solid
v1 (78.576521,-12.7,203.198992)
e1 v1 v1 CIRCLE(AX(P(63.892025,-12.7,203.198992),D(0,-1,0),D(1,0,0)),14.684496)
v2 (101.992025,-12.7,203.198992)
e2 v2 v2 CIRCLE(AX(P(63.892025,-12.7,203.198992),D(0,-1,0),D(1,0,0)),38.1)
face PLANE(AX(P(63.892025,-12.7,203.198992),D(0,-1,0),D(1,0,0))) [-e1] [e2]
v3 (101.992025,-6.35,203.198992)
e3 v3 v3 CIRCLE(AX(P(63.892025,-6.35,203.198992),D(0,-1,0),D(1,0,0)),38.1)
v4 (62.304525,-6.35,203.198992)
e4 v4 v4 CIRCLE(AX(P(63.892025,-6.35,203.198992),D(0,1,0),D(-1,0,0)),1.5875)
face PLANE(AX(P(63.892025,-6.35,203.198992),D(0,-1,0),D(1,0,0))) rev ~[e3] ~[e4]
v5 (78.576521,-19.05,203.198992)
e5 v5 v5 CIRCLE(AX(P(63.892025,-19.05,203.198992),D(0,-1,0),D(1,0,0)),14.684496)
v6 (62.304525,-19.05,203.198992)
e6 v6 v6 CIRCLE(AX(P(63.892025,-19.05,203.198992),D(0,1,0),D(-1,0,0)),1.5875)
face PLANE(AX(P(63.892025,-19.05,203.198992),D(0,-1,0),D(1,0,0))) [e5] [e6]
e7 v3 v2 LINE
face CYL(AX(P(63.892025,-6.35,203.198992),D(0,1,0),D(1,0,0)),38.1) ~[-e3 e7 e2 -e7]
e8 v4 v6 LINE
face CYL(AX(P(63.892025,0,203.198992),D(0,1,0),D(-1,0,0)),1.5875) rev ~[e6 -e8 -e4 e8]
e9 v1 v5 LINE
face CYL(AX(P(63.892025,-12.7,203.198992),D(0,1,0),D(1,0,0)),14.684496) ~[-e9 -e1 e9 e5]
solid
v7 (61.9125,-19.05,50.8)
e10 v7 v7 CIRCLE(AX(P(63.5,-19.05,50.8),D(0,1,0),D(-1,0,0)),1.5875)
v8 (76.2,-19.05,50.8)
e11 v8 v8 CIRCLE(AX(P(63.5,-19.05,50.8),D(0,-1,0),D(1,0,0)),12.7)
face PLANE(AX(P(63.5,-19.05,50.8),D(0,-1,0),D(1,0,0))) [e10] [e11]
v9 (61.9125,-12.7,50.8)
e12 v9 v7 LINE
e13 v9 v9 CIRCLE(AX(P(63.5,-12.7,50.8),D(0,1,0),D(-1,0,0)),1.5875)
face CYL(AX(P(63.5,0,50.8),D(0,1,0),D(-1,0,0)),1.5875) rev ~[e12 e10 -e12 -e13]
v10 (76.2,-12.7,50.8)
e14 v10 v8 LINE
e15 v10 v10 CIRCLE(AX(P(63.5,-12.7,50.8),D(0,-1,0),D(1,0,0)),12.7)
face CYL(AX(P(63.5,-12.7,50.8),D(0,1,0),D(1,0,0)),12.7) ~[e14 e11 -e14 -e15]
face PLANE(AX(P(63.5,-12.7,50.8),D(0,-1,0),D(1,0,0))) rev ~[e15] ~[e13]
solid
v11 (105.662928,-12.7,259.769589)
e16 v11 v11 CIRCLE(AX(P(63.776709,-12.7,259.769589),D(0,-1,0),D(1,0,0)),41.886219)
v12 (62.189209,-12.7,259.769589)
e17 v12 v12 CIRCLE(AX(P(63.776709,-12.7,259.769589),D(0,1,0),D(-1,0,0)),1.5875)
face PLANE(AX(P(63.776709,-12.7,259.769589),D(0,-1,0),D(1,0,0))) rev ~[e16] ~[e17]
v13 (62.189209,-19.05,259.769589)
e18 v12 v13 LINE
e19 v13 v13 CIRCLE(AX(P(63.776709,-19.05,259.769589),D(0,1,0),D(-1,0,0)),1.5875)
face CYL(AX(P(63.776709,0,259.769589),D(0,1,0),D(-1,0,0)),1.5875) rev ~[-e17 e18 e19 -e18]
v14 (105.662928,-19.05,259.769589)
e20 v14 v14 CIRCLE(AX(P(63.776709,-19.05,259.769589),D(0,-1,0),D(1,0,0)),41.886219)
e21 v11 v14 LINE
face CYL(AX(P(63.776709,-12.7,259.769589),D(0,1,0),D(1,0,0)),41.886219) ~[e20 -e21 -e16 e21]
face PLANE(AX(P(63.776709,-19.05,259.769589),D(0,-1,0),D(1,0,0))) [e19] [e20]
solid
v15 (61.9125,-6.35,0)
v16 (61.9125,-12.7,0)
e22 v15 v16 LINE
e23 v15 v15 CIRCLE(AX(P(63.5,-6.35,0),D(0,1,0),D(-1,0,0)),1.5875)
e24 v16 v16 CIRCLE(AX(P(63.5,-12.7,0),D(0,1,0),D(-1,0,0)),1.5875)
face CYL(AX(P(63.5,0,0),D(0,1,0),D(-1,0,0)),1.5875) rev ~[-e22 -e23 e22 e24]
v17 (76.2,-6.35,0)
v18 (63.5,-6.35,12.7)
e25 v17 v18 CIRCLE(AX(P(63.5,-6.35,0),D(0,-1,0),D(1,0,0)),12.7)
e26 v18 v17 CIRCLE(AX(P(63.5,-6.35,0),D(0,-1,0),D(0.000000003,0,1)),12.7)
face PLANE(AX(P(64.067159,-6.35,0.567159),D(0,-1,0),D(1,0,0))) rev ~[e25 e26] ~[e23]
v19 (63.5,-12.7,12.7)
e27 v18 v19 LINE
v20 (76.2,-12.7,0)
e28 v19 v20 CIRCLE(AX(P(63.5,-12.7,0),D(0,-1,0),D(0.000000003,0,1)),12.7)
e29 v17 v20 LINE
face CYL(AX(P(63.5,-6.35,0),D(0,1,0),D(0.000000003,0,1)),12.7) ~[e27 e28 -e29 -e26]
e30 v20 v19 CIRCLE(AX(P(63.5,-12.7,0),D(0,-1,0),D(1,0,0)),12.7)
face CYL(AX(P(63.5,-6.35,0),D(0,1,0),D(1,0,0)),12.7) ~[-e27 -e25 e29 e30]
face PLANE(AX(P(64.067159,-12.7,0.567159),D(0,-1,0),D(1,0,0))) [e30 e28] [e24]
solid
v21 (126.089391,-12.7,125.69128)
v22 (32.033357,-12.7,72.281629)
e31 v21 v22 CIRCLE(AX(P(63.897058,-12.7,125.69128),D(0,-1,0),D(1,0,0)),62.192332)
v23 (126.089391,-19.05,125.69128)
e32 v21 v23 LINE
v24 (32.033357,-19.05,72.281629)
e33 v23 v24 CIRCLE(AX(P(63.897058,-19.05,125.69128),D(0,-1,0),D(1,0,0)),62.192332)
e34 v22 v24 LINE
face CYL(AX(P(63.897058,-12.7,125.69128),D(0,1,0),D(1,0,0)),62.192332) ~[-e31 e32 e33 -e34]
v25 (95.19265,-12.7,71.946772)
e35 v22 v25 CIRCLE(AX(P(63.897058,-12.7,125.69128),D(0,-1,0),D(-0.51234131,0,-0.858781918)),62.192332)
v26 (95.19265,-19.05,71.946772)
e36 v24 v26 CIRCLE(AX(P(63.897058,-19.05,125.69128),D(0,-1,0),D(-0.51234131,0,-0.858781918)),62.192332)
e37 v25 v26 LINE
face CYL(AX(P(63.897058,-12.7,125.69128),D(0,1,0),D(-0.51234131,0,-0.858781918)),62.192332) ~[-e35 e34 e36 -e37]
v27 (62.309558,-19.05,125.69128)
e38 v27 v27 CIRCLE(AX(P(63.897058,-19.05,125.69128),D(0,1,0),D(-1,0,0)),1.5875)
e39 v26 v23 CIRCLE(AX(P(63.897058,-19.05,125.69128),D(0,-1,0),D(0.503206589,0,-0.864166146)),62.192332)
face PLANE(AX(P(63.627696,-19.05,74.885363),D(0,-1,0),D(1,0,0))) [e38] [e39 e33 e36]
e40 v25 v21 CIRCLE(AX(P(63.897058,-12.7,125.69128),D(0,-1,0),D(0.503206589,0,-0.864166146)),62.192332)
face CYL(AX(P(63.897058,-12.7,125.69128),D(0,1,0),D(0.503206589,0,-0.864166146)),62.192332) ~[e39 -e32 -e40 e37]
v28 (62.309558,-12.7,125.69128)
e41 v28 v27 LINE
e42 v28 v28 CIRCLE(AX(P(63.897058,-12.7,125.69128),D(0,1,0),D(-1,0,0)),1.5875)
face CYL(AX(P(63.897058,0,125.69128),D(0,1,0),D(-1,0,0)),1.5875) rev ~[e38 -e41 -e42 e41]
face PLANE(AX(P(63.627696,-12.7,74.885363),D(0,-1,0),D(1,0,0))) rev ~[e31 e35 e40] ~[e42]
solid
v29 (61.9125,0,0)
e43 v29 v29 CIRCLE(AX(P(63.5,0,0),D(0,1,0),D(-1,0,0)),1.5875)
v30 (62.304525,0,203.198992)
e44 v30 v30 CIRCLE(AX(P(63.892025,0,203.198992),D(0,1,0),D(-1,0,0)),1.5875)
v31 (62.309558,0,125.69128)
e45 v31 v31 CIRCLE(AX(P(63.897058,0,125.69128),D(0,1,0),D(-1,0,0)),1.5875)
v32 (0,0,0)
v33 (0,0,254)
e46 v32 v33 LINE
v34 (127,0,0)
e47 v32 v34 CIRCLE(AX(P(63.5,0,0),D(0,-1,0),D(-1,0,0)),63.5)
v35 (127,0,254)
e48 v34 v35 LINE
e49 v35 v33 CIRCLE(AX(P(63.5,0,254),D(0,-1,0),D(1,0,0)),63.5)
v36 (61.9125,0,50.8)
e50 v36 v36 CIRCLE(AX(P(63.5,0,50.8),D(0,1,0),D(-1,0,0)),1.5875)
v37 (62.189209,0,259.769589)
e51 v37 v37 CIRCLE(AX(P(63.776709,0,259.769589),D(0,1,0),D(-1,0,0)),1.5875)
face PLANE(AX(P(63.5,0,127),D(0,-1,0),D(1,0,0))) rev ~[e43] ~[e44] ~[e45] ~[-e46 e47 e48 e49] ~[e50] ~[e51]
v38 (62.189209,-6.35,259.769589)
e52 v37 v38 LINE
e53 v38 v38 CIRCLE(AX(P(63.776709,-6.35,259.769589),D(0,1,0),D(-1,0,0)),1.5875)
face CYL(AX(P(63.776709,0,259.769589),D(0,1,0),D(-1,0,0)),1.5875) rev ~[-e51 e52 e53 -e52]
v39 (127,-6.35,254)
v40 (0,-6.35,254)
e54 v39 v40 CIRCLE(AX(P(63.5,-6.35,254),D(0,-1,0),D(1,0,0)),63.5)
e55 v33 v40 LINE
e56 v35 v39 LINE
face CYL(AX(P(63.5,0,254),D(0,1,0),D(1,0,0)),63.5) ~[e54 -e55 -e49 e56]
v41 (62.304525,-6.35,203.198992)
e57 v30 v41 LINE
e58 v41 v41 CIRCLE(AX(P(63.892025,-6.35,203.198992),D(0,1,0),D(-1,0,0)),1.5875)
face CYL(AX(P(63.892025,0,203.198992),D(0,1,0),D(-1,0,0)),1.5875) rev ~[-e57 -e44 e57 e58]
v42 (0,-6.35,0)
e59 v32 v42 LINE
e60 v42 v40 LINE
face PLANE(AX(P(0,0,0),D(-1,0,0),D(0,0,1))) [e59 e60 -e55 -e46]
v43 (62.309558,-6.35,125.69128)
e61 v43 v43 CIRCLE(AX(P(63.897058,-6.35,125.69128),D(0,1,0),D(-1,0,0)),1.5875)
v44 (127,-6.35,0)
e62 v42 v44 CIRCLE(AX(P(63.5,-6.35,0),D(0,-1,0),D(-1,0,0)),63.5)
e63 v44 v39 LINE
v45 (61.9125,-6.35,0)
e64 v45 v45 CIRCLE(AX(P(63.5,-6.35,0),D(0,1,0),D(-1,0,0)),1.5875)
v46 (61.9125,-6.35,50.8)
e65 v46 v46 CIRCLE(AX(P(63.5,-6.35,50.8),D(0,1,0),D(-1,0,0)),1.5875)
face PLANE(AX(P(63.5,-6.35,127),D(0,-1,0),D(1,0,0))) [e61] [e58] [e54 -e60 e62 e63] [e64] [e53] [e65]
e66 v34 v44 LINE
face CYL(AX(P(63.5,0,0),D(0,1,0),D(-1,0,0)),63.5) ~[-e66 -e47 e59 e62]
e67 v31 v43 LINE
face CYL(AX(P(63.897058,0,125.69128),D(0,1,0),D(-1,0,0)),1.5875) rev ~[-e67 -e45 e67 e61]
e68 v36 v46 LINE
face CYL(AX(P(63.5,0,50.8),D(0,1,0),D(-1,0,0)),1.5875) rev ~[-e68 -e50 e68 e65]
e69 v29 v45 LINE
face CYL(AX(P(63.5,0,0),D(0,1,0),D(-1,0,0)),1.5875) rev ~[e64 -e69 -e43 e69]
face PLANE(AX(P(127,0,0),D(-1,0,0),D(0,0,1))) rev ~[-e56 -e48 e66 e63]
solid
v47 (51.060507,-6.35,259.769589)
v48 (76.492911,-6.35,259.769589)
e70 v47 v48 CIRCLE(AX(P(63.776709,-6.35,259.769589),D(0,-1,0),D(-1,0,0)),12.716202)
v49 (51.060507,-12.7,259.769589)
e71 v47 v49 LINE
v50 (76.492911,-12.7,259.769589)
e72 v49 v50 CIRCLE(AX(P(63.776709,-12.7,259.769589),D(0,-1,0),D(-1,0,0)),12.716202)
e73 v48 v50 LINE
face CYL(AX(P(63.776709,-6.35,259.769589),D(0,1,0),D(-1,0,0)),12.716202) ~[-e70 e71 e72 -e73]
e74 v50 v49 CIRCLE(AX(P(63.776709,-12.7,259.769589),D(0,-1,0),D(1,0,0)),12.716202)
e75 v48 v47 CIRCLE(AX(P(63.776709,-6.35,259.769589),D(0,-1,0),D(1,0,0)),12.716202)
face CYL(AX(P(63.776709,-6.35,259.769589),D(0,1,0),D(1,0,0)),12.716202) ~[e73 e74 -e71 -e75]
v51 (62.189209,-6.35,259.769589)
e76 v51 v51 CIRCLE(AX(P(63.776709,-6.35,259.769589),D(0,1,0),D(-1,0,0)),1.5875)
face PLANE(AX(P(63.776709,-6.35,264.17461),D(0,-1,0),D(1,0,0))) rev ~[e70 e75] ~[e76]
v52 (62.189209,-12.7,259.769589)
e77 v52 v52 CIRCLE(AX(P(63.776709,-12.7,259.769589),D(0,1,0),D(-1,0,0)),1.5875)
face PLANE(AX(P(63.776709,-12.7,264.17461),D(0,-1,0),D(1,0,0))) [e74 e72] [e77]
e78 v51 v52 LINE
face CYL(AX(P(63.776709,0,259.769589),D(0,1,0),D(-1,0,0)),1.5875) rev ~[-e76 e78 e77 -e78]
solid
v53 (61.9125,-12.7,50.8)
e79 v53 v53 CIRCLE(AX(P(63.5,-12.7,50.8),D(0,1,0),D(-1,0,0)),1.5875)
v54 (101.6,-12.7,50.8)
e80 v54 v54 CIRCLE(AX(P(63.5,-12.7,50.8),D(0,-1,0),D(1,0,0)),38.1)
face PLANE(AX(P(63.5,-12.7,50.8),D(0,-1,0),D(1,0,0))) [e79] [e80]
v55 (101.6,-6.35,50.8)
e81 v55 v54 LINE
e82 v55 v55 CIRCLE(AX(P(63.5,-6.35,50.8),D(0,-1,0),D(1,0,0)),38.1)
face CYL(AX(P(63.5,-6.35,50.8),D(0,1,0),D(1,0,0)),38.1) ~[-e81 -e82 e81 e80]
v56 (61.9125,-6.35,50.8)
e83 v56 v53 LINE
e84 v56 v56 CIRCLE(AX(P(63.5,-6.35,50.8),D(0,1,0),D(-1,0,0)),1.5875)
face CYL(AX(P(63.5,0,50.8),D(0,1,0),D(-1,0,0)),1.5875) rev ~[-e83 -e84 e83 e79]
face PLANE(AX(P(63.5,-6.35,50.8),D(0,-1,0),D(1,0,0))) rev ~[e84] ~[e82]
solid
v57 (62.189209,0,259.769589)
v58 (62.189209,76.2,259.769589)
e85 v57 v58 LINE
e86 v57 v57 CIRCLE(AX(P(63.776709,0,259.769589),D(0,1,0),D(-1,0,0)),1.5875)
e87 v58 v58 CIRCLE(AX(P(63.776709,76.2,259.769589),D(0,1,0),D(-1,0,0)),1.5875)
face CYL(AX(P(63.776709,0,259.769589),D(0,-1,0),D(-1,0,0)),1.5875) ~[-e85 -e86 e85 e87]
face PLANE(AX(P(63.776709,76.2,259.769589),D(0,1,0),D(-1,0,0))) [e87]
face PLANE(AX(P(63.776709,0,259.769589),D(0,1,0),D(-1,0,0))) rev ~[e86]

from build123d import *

# Parameters (mm, degrees)
F0_W      = 127
F0_H      = 254
F1_DEPTH  = 6.35
F4_DEPTH  = 6.35
F5_R      = 12.7
F6_DEPTH  = 6.35
F8_DEPTH  = 6.35
F10_DEPTH = 6.35
F11_R     = 14.6844956333
F12_DEPTH = 6.35
F14_DEPTH = 6.35
F15_R     = 41.8862190393
F16_DEPTH = 6.35
F17_R     = 1.5875
F18_DEPTH = 19.051
F19_DEPTH = 76.2


# Not quite as in the source:
# - the program builds the solid bodies; features that only make, move or delete a surface that nothing else refers to are left out


with BuildPart() as f1:
    # F0 (on Front) → F1 (new body)
    with BuildSketch(Plane.XZ):
        with Locations((63.5, 127)):
            Rectangle(F0_W, F0_H)
        with BuildLine():
            ThreePointArc((127, 254), (63.5, 317.5), (0, 254))
            Line((0, 254), (127, 254))
        make_face()
        with BuildLine():
            Line((127, 0), (0, 0))
            ThreePointArc((0, 0), (63.5, -63.5), (127, 0))
        make_face()
    extrude(amount=F1_DEPTH)


with BuildPart() as f4:
    # F2 (on face) → F4 (new body)
    with BuildSketch(Plane.XZ.offset(6.35)):
        with BuildLine():
            ThreePointArc((63.5, 88.9), (25.4, 50.7999999784), (63.5000000432, 12.7))
            ThreePointArc((63.5000000432, 12.7), (90.4407683785, 23.8592316521), (101.6, 50.8))
            ThreePointArc((101.6, 50.8), (90.4407683632, 77.7407683632), (63.5, 88.9))
        make_face()
    extrude(amount=F4_DEPTH)


with BuildPart() as f4b:
    # F2 (on face) → F4, piece 2 (new body)
    with BuildSketch(Plane.XZ.offset(6.35)):
        with BuildLine():
            ThreePointArc((63.5000000432, 12.7), (54.5197438636, -8.9802561058), (76.2, 0))
            ThreePointArc((76.2, 0), (72.4802561364, 8.9802561058), (63.5000000432, 12.7))
        make_face()
    extrude(amount=F4_DEPTH)


with BuildPart() as f6:
    # F5 (on face) → F6 (new body)
    with BuildSketch(Plane.XZ.offset(12.7)):
        with Locations((63.5, 50.8)):
            Circle(F5_R)
    extrude(amount=F6_DEPTH)


with BuildPart() as f8:
    # F7 (on face) → F8 (new body)
    with BuildSketch(Plane.XZ.offset(12.7)):
        with BuildLine():
            ThreePointArc((95.1926497876, 71.946771608), (63.7019956295, 88.8994645338), (32.0333573438, 72.2816293597))
            ThreePointArc((32.0333573438, 72.2816293597), (63.5673318765, 63.4998215113), (95.1926497876, 71.946771608))
        make_face()
        with BuildLine():
            ThreePointArc((95.1926497876, 71.946771608), (117.8147364594, 94.69498662), (126.0893906907, 125.6912797689))
            ThreePointArc((126.0893906907, 125.6912797689), (33.1870574181, 179.7725338358), (32.0333573438, 72.2816293597))
            ThreePointArc((32.0333573438, 72.2816293597), (63.7019956295, 88.8994645338), (95.1926497876, 71.946771608))
        make_face()
    extrude(amount=F8_DEPTH)


with BuildPart() as f10:
    # F3 (on face) → F10 (new body)
    with BuildSketch(Plane.XZ.offset(6.35)):
        with BuildLine():
            ThreePointArc((63.6960125926, 165.0994957849), (90.7634033509, 176.1890111487), (101.9920253124, 203.1989915691))
            ThreePointArc((101.9920253124, 203.1989915691), (37.020647274, 230.2089719896), (63.6960125926, 165.0994957849))
        make_face()
    extrude(amount=F10_DEPTH)

    # F11 (on face) → F12 (join)
    with BuildSketch(Plane.XZ.offset(12.7)):
        with Locations((63.8920253124, 203.1989915691)):
            Circle(F11_R)
    extrude(amount=F12_DEPTH)


with BuildPart() as f14:
    # F13 (on face) → F14 (new body)
    with BuildSketch(Plane.XZ.offset(6.35)):
        with BuildLine():
            ThreePointArc((76.4929108533, 259.7695887089), (63.7767091393, 272.4857904229), (51.0605074254, 259.7695887089))
            Line((51.0605074254, 259.7695887089), (76.4929108533, 259.7695887089))
        make_face()
        with BuildLine():
            Line((76.4929108533, 259.7695887089), (51.0605074254, 259.7695887089))
            ThreePointArc((51.0605074254, 259.7695887089), (63.7767091393, 247.0533869949), (76.4929108533, 259.7695887089))
        make_face()
    extrude(amount=F14_DEPTH)


with BuildPart() as f16:
    # F15 (on face) → F16 (new body)
    with BuildSketch(Plane.XZ.offset(12.7)):
        with Locations((63.7767091393, 259.7695887089)):
            Circle(F15_R)
    extrude(amount=F16_DEPTH)


with BuildPart() as f18_tool:
    # F17 (on face) → F18 (new body, through all)
    with BuildSketch(Plane(origin=(0, 0, 0), x_dir=(-1, 0, 0), z_dir=(0, 1, 0))):
        with Locations((-63.7767091393, 259.7695887089)):
            Circle(F17_R)
        with Locations((-63.8920253124, 203.1989915691)):
            Circle(F17_R)
        with Locations((-63.8970583677, 125.6912797689)):
            Circle(F17_R)
        with Locations((-63.5, 50.8)):
            Circle(F17_R)
        with Locations((-63.5, 0)):
            Circle(F17_R)
    extrude(amount=-F18_DEPTH)


with BuildPart() as f1_1:
    add(f1.part)

    # F18: cut by f18_tool
    add(f18_tool.part, mode=Mode.SUBTRACT)


with BuildPart() as f4_1:
    add(f4.part)

    # F18: cut by f18_tool
    add(f18_tool.part, mode=Mode.SUBTRACT)


with BuildPart() as f4b_1:
    add(f4b.part)

    # F18: cut by f18_tool
    add(f18_tool.part, mode=Mode.SUBTRACT)


with BuildPart() as f6_1:
    add(f6.part)

    # F18: cut by f18_tool
    add(f18_tool.part, mode=Mode.SUBTRACT)


with BuildPart() as f8_1:
    add(f8.part)

    # F18: cut by f18_tool
    add(f18_tool.part, mode=Mode.SUBTRACT)


with BuildPart() as f10_1:
    add(f10.part)

    # F18: cut by f18_tool
    add(f18_tool.part, mode=Mode.SUBTRACT)


with BuildPart() as f14_1:
    add(f14.part)

    # F18: cut by f18_tool
    add(f18_tool.part, mode=Mode.SUBTRACT)


with BuildPart() as f16_1:
    add(f16.part)

    # F18: cut by f18_tool
    add(f18_tool.part, mode=Mode.SUBTRACT)


with BuildPart() as f19:
    # F17 (on face) → F19 (new body)
    with BuildSketch(Plane(origin=(0, 0, 0), x_dir=(-1, 0, 0), z_dir=(0, 1, 0))):
        with Locations((-63.7767091393, 259.7695887089)):
            Circle(F17_R)
    extrude(amount=F19_DEPTH)


solid = Compound([f1_1.part, f4_1.part, f4b_1.part, f6_1.part, f8_1.part, f10_1.part, f14_1.part, f16_1.part, f19.part])
